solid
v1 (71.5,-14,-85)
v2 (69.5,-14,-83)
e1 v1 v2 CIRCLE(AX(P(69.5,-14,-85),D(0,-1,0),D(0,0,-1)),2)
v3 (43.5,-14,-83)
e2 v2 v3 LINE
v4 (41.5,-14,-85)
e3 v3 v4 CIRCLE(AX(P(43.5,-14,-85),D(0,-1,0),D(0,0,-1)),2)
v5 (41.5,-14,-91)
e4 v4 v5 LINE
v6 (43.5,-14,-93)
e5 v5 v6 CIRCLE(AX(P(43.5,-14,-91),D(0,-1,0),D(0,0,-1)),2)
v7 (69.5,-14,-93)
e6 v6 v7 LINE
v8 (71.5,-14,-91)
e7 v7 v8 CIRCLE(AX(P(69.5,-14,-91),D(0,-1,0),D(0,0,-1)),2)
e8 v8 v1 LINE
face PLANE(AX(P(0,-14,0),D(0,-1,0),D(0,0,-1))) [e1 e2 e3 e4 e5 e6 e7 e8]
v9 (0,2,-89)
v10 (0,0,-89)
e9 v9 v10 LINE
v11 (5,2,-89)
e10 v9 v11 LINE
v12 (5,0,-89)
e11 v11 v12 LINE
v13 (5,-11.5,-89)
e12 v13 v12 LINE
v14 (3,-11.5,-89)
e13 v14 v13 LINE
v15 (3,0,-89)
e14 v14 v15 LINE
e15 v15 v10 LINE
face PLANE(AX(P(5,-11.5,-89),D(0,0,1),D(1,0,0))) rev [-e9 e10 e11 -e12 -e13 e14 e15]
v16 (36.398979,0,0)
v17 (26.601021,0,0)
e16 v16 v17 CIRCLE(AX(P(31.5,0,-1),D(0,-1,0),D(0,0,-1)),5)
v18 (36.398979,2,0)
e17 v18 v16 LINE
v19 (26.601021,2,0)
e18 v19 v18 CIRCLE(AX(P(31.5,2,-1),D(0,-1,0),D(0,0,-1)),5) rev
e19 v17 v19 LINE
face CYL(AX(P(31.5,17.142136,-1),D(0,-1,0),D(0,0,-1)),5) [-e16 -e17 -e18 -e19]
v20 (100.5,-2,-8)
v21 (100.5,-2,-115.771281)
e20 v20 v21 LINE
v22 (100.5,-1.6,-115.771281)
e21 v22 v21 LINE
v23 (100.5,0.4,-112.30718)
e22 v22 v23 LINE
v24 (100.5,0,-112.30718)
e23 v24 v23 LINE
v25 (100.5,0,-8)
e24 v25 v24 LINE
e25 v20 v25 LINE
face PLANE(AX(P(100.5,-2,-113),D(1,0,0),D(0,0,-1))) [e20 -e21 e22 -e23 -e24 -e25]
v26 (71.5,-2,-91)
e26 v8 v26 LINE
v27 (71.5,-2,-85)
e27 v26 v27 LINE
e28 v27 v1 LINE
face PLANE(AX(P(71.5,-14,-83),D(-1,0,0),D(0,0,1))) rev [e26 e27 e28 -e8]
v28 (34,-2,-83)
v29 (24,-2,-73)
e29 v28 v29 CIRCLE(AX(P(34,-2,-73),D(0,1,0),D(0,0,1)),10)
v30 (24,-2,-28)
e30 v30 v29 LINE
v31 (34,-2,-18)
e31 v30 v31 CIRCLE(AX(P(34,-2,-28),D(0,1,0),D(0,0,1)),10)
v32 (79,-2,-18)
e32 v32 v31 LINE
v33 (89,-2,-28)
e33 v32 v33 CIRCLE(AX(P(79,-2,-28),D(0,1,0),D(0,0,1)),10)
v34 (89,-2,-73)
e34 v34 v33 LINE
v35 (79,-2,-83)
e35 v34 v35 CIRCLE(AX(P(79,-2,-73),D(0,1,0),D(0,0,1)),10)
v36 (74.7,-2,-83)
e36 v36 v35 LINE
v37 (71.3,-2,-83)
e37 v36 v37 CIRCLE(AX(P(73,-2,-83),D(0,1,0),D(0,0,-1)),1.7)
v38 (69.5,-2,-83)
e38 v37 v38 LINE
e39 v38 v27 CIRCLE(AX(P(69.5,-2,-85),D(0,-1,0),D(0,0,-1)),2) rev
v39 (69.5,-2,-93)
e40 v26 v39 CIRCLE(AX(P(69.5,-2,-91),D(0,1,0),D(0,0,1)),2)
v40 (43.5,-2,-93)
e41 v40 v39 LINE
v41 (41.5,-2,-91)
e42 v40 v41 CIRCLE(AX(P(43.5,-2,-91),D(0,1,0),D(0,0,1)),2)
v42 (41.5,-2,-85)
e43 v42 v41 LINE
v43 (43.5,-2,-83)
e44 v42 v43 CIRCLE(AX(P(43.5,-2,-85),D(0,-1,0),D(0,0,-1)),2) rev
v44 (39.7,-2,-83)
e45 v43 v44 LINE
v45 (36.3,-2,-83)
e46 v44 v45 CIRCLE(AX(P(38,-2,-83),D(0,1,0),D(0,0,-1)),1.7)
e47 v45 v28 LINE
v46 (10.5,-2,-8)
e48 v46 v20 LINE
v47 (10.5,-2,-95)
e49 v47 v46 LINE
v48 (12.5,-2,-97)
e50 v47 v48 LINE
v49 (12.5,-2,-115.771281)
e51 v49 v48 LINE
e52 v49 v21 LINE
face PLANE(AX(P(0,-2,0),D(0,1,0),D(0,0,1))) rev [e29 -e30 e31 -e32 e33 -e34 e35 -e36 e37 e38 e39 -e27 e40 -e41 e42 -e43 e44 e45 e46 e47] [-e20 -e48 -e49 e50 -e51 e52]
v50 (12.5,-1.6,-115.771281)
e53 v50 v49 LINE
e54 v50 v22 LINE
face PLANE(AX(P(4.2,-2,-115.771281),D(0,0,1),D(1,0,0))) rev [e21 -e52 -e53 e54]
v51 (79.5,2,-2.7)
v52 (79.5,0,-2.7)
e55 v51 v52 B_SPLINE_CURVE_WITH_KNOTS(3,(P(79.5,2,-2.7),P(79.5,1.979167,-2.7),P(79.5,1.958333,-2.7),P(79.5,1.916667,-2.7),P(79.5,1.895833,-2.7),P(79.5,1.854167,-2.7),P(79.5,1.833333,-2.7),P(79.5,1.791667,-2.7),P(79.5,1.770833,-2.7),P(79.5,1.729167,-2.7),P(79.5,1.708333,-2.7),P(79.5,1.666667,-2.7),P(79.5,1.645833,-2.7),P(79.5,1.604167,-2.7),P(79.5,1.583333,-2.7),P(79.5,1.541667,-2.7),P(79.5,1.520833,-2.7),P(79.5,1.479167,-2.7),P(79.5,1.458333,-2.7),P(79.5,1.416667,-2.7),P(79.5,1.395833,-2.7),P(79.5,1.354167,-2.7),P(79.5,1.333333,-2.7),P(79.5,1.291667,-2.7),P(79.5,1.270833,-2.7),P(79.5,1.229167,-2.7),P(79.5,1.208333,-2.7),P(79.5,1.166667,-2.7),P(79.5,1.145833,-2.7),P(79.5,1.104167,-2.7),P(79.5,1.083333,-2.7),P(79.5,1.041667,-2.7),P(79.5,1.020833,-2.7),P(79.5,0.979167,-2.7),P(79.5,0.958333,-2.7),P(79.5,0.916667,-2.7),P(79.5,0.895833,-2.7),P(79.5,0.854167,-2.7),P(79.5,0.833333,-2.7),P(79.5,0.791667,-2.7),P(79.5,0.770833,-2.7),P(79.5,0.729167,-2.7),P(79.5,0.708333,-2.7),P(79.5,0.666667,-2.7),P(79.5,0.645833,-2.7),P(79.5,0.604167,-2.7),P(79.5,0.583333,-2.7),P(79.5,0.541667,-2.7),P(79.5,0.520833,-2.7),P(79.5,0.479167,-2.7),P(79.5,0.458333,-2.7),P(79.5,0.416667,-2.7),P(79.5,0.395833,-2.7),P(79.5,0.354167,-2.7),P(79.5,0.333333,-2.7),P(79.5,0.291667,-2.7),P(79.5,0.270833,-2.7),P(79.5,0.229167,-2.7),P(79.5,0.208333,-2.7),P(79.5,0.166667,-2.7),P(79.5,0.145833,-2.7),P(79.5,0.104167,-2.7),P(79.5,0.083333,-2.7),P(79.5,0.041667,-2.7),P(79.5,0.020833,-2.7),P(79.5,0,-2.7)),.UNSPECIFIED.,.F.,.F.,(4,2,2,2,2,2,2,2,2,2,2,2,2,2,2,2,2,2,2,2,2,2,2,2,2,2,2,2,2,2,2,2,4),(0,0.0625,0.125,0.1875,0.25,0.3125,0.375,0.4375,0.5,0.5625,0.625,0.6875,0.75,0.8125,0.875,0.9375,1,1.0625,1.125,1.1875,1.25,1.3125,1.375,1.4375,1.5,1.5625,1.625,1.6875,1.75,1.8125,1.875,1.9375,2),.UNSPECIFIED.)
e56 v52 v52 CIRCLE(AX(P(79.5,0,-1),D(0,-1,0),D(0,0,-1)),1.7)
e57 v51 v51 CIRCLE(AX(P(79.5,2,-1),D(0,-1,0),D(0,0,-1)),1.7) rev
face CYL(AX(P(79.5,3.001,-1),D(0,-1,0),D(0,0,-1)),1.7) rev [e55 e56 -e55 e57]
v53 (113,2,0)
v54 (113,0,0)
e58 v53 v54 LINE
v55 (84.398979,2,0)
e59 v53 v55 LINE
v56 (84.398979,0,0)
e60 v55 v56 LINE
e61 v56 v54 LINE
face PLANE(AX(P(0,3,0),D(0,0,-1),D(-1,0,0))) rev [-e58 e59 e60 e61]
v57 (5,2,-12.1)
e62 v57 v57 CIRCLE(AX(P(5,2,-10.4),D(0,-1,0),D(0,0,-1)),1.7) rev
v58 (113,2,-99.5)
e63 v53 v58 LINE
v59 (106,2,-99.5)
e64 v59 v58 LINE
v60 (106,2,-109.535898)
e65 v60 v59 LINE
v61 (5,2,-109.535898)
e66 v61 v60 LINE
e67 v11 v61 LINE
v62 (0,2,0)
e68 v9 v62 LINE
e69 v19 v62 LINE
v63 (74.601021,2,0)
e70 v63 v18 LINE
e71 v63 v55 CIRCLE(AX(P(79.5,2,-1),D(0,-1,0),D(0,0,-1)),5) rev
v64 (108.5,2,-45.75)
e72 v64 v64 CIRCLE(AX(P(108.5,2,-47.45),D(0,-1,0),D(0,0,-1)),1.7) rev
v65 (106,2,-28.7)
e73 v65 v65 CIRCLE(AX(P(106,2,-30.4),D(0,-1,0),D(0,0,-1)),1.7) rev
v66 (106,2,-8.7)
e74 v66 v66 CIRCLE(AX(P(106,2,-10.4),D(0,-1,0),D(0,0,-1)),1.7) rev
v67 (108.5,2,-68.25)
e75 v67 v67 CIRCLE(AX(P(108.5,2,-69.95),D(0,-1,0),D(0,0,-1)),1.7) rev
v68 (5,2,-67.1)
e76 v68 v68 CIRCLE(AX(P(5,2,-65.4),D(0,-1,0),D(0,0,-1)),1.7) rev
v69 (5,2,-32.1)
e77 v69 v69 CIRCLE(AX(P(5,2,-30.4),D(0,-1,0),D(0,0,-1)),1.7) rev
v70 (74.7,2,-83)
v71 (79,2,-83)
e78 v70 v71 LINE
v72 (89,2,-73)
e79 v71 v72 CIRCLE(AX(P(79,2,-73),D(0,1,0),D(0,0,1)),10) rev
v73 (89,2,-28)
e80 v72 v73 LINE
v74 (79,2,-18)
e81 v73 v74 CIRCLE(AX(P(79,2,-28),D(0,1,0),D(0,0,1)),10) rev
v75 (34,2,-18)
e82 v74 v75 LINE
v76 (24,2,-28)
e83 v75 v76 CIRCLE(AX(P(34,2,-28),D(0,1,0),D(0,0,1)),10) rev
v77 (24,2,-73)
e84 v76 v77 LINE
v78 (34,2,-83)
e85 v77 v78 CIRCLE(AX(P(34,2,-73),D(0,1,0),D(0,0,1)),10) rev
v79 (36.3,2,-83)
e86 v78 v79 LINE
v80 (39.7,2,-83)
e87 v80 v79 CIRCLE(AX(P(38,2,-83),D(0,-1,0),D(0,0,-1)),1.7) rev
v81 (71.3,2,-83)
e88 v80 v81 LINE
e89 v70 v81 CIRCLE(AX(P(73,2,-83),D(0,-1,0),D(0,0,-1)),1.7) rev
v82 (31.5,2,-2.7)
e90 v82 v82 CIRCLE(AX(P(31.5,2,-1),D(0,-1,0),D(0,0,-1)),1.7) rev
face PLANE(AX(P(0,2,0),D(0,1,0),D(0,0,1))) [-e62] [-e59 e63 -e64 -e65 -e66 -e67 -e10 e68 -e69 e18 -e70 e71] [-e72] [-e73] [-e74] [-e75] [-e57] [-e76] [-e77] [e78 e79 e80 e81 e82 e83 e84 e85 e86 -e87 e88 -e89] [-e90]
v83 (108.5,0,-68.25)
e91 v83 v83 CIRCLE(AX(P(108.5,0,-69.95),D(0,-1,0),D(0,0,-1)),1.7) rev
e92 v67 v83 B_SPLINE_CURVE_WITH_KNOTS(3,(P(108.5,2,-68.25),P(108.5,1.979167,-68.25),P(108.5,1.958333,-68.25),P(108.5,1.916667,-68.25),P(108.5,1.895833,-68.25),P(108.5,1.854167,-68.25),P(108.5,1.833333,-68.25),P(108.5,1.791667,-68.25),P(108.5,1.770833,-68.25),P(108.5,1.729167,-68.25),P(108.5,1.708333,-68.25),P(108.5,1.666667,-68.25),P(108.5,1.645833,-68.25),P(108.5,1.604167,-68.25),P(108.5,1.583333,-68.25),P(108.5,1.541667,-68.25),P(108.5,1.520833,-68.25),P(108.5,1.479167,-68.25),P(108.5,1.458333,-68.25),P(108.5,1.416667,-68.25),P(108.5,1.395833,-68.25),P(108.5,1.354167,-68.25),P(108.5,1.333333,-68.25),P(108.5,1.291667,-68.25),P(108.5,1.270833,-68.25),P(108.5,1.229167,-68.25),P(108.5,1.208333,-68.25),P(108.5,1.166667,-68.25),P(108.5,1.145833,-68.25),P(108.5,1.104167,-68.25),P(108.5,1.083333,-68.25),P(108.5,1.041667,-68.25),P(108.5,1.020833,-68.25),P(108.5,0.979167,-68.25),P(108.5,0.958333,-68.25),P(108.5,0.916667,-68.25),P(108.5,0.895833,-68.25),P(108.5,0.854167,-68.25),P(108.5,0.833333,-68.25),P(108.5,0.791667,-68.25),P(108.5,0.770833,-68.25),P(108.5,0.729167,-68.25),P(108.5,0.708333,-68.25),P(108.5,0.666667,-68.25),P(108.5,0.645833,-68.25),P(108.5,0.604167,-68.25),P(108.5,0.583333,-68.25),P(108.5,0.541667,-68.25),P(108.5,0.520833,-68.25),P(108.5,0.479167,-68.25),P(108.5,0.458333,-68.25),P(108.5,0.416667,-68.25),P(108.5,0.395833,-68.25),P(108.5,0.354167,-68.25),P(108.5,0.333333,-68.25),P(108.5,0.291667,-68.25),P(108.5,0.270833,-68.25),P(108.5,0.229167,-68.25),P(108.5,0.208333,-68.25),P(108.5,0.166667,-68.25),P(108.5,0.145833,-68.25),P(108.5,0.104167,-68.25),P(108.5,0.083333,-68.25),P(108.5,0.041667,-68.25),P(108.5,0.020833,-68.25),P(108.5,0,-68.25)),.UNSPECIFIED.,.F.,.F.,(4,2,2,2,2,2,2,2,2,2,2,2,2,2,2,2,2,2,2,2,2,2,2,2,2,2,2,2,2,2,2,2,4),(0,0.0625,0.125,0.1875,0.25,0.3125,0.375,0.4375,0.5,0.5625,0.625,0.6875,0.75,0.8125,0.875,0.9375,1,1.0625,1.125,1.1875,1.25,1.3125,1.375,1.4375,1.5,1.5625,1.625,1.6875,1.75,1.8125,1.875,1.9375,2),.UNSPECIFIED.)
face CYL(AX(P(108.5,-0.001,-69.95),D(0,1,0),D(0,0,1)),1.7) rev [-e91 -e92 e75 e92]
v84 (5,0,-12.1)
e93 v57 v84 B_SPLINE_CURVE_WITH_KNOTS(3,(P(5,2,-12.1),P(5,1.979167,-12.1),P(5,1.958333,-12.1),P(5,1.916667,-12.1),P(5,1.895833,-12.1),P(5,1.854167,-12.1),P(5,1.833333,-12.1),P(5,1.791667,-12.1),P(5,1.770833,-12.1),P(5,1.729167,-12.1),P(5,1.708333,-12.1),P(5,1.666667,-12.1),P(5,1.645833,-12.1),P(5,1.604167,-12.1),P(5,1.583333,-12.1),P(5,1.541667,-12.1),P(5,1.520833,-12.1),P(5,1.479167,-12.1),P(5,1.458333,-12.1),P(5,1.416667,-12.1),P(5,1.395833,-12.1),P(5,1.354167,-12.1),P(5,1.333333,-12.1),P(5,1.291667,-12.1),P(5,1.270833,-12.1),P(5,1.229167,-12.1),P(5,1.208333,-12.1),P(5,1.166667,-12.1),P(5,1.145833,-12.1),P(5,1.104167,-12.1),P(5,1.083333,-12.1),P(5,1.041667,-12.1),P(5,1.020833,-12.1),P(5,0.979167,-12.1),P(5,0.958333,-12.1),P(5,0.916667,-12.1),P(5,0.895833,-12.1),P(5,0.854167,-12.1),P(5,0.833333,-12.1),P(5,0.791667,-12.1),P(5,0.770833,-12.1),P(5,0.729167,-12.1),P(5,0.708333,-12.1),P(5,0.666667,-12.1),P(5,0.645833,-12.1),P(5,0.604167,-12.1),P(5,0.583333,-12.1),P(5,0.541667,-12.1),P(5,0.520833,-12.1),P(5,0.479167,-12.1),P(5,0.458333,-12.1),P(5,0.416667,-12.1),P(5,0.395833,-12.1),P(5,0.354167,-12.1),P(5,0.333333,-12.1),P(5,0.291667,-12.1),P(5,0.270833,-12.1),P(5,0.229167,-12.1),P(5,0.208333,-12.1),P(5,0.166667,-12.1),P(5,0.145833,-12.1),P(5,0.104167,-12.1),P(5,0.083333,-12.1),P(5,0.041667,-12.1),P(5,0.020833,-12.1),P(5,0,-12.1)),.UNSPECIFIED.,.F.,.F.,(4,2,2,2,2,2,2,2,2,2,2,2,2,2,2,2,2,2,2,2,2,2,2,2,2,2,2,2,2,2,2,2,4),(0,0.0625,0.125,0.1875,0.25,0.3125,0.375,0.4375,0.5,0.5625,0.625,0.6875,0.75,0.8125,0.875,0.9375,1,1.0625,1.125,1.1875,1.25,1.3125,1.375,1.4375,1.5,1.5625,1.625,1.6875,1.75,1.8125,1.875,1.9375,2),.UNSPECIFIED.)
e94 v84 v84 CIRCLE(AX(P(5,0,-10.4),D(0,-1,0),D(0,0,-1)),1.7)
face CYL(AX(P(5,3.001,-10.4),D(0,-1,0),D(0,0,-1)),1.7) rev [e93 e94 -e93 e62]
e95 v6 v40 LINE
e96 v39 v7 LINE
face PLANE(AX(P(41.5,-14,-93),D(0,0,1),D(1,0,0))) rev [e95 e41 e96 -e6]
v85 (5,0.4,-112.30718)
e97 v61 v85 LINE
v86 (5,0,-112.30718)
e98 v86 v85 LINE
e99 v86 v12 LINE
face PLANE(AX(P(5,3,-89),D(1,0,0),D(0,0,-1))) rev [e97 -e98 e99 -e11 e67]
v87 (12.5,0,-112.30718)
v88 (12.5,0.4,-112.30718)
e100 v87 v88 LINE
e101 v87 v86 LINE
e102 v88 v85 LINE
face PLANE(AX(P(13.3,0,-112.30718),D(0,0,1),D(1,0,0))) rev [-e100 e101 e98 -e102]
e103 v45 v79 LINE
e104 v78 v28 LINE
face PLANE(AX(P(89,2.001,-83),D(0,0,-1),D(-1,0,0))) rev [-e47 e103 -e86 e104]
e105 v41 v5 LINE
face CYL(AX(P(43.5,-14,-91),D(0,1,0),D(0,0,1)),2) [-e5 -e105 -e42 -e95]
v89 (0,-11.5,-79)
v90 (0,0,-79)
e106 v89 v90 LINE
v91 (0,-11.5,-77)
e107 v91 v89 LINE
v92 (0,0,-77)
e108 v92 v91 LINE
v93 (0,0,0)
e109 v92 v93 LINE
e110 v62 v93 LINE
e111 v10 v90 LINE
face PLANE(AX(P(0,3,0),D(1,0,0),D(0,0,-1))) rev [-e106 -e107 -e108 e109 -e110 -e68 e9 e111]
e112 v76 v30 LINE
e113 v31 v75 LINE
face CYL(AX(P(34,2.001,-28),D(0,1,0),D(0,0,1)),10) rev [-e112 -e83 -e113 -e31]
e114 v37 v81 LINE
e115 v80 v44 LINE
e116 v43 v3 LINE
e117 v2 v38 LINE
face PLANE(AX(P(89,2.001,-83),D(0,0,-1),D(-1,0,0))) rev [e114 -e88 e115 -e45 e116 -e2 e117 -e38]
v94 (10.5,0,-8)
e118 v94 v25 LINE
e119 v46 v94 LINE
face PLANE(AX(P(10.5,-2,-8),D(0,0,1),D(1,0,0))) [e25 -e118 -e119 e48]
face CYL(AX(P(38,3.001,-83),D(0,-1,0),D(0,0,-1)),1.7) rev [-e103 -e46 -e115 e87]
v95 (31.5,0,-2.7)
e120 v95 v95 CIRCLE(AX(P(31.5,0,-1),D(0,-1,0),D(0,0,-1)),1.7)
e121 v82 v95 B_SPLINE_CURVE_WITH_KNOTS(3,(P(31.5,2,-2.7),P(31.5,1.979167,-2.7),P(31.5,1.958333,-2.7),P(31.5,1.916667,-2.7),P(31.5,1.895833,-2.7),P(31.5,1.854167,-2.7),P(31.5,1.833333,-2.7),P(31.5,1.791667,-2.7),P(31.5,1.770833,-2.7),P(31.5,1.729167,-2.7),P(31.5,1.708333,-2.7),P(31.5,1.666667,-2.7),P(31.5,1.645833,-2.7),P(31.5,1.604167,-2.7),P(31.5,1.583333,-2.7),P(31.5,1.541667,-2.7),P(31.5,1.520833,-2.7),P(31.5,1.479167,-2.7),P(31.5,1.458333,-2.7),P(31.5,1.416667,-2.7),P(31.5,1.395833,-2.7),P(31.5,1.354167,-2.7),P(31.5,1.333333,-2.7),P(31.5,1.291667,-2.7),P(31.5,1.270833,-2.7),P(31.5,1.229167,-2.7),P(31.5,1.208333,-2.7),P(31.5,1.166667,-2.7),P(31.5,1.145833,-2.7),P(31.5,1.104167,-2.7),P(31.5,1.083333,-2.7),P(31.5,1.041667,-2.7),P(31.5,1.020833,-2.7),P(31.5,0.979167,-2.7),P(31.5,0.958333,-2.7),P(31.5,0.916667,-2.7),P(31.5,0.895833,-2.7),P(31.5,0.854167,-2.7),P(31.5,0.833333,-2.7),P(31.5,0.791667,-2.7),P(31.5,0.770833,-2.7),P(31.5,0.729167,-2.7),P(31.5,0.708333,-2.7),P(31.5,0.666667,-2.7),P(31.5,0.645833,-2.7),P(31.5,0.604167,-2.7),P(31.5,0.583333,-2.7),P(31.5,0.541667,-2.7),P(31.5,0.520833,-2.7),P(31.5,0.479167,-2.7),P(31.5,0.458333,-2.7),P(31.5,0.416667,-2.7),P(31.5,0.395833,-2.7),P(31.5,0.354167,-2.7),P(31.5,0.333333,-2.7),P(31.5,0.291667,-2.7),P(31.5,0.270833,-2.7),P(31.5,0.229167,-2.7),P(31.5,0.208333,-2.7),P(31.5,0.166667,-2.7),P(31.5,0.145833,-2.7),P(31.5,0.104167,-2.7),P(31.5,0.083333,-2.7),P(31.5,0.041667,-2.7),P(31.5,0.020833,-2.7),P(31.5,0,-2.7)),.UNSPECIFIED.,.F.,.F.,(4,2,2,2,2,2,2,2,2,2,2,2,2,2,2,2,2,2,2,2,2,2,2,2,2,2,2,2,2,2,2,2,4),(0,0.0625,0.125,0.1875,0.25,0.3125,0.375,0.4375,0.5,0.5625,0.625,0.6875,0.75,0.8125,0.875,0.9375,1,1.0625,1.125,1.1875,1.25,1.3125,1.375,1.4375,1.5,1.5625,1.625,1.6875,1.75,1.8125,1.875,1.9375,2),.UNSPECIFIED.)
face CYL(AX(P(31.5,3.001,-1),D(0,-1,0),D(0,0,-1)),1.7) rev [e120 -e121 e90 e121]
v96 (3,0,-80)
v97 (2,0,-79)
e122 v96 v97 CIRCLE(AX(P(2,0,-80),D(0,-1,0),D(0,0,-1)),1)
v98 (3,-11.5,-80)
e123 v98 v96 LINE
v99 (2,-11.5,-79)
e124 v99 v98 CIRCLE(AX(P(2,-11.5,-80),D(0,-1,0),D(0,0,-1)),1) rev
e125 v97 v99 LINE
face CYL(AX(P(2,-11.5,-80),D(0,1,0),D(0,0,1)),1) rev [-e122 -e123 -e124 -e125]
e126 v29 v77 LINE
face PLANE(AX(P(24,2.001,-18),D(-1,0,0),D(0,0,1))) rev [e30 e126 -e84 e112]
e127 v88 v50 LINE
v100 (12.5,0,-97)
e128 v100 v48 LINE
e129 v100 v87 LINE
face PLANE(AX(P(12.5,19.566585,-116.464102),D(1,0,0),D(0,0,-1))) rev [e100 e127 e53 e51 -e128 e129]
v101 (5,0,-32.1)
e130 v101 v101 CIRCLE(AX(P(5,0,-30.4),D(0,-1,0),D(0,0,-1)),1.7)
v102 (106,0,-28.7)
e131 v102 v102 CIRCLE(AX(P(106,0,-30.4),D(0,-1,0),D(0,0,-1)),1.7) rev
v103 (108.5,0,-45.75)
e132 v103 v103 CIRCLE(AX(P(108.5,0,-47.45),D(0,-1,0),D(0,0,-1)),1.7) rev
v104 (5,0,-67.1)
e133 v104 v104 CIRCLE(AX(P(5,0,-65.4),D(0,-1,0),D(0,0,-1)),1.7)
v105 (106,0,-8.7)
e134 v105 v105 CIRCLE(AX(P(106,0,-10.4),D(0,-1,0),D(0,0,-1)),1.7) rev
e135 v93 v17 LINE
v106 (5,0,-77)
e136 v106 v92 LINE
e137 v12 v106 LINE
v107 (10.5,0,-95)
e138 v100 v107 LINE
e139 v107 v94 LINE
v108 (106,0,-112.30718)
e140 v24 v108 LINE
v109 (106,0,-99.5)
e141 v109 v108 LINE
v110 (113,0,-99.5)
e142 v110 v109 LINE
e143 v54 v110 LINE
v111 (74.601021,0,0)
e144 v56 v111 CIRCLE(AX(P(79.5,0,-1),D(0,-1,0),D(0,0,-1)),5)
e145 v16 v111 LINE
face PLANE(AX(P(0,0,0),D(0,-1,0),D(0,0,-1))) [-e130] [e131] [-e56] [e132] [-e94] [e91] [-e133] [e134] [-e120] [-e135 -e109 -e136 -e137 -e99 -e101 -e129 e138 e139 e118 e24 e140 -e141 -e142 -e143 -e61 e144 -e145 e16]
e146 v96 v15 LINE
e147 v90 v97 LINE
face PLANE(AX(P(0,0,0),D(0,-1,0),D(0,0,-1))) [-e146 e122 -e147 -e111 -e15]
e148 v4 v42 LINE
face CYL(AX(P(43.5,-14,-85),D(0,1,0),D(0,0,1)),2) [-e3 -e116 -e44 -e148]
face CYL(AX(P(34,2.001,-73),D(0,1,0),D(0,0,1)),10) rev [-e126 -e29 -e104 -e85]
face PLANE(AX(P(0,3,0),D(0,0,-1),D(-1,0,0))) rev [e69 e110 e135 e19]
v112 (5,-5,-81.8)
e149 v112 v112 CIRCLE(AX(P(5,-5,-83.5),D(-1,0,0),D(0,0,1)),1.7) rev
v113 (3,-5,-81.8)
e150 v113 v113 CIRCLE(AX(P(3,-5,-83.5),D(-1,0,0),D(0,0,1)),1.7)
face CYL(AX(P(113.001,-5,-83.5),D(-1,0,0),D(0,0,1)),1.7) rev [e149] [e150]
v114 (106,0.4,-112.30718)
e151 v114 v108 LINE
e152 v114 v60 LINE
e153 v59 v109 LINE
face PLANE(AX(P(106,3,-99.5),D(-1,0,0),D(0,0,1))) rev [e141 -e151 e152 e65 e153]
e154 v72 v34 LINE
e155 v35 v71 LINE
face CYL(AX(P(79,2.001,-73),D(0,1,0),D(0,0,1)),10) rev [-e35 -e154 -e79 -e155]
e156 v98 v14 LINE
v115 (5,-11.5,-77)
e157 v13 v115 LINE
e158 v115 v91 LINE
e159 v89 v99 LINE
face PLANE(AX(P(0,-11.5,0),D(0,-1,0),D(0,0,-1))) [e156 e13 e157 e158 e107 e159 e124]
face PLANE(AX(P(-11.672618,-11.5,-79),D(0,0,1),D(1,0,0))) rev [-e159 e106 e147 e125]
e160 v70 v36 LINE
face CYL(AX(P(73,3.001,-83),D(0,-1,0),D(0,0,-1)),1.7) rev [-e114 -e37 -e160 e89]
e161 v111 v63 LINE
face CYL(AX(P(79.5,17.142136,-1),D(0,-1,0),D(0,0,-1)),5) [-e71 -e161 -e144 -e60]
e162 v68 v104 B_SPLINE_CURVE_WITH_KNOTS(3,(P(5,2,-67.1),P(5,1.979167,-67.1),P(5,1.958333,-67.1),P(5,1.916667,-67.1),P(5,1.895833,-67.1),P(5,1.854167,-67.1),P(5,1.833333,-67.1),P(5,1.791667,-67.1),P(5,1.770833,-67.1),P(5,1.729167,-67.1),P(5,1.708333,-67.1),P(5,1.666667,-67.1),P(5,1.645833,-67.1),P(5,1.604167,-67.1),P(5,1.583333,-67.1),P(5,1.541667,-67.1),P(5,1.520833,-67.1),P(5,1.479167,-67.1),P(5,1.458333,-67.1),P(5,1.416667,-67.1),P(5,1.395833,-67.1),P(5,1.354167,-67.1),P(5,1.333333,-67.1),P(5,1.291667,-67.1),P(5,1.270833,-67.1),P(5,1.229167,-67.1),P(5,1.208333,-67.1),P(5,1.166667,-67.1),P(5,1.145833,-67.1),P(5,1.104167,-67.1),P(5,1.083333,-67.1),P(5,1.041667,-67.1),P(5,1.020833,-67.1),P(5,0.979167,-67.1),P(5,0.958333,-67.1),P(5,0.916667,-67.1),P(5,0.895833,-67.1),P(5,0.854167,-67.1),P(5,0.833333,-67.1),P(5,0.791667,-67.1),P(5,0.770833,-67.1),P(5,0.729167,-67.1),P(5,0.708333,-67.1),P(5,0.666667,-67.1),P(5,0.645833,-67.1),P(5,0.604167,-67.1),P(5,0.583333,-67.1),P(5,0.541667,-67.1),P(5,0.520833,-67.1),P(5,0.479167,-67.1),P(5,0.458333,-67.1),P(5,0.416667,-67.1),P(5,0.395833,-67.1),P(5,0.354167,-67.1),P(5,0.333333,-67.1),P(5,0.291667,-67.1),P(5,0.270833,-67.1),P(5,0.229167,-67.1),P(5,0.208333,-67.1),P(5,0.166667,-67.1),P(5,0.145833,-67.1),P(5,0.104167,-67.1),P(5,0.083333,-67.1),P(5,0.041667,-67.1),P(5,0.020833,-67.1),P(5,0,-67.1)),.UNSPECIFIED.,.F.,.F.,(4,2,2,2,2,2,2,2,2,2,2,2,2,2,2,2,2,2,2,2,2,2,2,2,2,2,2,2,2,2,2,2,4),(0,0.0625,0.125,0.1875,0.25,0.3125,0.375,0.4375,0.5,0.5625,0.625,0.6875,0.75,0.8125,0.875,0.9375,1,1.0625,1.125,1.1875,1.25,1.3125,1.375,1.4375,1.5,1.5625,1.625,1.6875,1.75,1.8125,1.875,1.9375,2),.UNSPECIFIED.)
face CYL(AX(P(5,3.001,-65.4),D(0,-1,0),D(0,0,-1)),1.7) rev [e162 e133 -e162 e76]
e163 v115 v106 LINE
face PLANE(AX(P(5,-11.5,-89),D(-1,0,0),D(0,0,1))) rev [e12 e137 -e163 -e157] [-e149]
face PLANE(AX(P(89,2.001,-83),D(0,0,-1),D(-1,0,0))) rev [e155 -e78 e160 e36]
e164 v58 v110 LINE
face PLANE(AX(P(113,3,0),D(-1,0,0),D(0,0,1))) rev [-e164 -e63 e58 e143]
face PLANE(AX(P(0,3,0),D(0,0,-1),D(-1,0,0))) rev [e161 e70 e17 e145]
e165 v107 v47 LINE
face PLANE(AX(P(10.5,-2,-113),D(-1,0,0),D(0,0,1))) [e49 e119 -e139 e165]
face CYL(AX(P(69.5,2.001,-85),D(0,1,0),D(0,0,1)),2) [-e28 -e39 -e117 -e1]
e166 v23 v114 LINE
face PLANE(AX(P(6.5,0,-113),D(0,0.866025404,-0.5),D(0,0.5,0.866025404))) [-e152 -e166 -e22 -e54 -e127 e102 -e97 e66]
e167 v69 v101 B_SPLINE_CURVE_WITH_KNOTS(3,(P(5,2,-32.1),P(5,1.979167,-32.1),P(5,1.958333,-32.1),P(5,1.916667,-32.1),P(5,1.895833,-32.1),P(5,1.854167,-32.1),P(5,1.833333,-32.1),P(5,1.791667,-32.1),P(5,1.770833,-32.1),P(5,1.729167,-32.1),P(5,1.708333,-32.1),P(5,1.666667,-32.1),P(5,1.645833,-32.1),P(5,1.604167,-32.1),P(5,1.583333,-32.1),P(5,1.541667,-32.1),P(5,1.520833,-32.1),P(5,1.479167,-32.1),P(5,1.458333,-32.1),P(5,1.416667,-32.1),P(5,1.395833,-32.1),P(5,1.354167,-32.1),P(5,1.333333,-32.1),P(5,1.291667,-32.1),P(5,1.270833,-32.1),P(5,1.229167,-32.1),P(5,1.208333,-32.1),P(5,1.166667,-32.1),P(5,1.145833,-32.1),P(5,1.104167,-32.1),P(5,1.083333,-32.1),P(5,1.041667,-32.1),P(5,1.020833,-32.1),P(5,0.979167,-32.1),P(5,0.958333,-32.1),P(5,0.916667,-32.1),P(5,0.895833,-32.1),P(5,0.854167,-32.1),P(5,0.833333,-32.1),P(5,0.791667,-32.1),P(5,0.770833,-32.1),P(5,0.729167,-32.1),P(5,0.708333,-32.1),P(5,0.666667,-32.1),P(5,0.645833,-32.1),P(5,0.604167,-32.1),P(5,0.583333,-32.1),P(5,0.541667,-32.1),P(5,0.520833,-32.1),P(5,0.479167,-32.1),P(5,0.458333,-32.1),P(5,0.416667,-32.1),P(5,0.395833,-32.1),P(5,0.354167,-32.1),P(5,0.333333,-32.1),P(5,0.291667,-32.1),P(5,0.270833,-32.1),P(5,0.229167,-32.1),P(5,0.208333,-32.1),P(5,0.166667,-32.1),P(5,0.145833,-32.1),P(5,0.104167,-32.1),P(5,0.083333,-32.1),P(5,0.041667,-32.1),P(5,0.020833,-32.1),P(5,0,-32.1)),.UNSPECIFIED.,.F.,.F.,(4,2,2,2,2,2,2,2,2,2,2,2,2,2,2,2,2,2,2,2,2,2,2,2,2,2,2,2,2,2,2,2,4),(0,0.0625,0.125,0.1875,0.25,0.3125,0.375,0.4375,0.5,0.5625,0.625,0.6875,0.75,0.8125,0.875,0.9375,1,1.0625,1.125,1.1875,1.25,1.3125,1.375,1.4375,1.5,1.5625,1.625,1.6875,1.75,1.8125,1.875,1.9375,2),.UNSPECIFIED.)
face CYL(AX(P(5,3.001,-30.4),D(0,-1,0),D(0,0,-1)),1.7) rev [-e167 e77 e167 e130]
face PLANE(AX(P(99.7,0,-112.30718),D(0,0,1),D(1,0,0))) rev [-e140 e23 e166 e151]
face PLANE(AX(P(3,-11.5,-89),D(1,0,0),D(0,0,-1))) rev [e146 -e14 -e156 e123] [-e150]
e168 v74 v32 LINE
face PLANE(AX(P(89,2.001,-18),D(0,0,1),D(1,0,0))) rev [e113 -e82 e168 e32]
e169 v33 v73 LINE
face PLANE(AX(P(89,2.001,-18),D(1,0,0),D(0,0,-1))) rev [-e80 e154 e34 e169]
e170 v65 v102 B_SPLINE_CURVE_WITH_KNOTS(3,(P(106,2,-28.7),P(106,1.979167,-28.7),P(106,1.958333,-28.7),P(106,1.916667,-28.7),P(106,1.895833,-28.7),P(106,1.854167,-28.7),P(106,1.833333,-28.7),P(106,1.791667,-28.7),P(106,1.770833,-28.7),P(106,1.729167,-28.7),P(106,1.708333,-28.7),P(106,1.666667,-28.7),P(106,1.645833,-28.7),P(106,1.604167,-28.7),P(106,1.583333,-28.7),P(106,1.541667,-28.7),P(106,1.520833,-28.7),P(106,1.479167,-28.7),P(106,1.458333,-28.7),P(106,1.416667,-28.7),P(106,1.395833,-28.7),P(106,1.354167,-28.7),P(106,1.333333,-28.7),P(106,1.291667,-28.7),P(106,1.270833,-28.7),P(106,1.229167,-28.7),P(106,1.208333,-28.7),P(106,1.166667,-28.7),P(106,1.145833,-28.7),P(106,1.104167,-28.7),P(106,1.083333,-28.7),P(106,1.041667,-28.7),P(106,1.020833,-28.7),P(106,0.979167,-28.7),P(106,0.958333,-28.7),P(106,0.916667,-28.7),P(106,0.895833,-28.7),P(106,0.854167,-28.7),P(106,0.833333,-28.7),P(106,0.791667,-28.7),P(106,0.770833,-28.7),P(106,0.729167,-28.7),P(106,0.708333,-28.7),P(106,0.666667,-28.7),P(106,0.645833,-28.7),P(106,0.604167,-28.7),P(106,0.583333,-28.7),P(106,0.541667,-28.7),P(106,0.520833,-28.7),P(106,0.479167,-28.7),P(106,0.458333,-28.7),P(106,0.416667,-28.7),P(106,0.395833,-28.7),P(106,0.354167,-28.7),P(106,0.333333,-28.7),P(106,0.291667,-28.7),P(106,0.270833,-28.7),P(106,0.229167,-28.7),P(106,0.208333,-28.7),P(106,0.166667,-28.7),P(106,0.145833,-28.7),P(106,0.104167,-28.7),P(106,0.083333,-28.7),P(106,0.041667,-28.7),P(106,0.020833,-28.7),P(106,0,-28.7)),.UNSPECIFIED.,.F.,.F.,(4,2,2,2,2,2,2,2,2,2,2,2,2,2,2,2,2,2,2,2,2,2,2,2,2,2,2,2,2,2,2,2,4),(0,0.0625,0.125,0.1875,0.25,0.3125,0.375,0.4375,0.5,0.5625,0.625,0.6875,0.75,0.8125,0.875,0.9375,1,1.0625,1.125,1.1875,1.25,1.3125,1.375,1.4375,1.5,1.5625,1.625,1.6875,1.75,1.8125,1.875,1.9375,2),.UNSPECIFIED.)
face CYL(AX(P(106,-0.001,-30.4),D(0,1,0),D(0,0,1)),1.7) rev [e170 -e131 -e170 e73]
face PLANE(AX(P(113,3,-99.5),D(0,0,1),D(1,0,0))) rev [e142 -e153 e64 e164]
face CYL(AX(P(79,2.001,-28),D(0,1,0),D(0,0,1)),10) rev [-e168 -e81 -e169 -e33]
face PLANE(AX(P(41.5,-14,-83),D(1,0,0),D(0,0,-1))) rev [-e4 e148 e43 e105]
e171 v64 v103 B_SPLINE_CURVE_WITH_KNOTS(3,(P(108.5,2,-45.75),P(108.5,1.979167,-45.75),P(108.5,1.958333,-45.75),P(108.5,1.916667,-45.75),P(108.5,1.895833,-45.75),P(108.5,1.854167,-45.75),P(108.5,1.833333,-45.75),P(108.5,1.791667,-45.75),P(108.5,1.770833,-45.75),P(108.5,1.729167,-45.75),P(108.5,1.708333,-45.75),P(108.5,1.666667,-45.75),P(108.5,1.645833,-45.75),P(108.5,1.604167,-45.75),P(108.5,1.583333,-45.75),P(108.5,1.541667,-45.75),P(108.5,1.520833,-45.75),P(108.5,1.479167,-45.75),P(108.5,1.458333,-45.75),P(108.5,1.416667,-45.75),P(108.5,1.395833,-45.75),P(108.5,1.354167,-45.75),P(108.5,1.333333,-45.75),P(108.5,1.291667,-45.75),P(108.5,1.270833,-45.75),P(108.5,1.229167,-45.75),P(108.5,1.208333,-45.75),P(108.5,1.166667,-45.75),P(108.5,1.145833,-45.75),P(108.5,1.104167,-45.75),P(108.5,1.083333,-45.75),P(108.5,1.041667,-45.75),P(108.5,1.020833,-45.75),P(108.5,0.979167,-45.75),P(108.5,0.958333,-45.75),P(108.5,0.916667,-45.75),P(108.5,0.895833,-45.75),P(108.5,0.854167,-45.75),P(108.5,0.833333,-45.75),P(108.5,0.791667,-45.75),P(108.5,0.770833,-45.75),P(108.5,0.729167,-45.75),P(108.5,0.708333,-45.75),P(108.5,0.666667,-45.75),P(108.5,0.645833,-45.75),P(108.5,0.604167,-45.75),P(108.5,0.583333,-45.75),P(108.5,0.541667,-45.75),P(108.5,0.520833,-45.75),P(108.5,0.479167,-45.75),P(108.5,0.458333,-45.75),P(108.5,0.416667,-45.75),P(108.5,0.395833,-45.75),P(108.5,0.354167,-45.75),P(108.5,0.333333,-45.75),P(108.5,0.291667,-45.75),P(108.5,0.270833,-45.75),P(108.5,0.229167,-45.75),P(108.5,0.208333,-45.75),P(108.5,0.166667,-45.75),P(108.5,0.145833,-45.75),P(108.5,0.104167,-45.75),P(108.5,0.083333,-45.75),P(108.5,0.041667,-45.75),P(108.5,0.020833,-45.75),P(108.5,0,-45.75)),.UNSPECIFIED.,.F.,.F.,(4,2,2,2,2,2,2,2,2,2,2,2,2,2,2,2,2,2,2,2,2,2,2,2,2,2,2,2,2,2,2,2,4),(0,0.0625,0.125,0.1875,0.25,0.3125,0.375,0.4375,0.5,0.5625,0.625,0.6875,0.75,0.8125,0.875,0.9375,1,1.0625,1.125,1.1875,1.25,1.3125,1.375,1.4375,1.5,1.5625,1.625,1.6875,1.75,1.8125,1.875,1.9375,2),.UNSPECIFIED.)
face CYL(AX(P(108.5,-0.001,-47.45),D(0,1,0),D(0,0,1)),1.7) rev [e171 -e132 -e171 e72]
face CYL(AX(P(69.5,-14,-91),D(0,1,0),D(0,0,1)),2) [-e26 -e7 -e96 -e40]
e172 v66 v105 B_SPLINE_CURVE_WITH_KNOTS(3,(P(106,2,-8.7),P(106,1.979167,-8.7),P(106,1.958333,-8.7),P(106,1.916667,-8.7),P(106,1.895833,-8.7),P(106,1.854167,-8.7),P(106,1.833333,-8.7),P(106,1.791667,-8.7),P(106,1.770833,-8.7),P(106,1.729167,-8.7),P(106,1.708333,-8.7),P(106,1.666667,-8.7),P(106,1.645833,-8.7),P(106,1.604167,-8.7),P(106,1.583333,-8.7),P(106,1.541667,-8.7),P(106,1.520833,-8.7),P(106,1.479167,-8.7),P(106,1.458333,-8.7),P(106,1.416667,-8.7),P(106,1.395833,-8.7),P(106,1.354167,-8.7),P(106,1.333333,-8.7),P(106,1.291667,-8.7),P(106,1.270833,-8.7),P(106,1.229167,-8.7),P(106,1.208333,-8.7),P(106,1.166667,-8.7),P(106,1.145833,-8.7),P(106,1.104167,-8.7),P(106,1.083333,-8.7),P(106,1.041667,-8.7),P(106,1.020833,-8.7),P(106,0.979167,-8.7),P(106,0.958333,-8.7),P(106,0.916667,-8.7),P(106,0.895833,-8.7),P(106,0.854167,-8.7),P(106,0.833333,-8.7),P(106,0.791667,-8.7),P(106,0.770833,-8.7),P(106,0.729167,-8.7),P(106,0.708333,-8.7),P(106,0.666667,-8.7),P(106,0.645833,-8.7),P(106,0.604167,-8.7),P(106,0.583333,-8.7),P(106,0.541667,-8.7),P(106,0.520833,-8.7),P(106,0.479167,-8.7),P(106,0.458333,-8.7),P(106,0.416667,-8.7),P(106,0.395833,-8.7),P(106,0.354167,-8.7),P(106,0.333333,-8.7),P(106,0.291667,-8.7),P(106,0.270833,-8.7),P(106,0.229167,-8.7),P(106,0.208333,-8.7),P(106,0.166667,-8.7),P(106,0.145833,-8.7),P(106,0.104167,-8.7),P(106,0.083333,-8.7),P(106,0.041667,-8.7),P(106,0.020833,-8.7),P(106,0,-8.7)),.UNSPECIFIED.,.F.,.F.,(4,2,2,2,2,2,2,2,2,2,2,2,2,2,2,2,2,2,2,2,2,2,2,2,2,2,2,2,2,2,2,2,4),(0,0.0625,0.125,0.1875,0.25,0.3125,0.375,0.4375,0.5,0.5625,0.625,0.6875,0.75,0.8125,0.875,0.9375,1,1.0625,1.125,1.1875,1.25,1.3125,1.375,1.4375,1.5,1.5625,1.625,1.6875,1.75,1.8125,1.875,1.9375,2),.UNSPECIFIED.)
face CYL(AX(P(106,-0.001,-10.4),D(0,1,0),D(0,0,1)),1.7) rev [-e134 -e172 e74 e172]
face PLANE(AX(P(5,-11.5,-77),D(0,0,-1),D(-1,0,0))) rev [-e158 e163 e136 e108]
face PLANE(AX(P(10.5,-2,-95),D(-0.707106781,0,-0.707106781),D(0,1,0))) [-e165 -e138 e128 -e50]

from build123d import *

# Parameters (mm, degrees)
SKETCH_1_W               = 113
SKETCH_1_H               = 113
EXTRUDE_1_DEPTH          = 3
CUT_EXTRUDE_1_REACH      = 161.834
SKETCH_2_R               = 1.7
SKETCH_3_W               = 90
SKETCH_3_H               = 105
EXTRUDE_2_DEPTH          = 2
SKETCH_5_R               = 5
EXTRUDE_3_DEPTH          = 3
CUT_EXTRUDE_2_REACH      = 161.834
SKETCH_6_R               = 1.7
CUT_EXTRUDE_3_REACH      = 161.834
SKETCH_7_R               = 1.7
CUT_EXTRUDE_4_REACH      = 161.884
SKETCH_8_R               = 1.7
EXTRUDE_5_DEPTH          = 90
CUT_EXTRUDE_5_DEPTH      = 2
SKETCH_13_W              = 2
SKETCH_13_H              = 12
EXTRUDE_6_DEPTH          = 11.5
CUT_EXTRUDE_6_REACH      = 162.612
SKETCH_14_R              = 1.7
CUT_EXTRUDE_7_REACH      = 164.681
EXTRUDE_7_DEPTH          = 8.5
SKETCH_17_W              = 2
SKETCH_17_H              = 11.5
EXTRUDE_8_DEPTH          = 3
FILLET_1_R               = 1
CUT_EXTRUDE_8_DEPTH      = 163.681089759
SKETCH_20_W              = 113
SKETCH_20_H              = 12.124355653
CUT_EXTRUDE_9_DEPTH      = 1
CHAMFER_1_SIZE           = 1
SKETCH_21_W              = 7
SKETCH_21_H              = 13.5
CUT_EXTRUDE_10_DEPTH     = 163.681089759
SKETCH_22_W              = 5
SKETCH_22_H              = 24
CUT_EXTRUDE_11_DEPTH     = 163.681089759
SKETCH_23_W              = 2
SKETCH_23_H              = 19.464101615
CUT_EXTRUDE_12_DEPTH     = 2
CUT_EXTRUDE_START        = -2
CUT_EXTRUDE_13_OUTLINE_W = 93
CUT_EXTRUDE_13_OUTLINE_H = 1.228718708
CUT_EXTRUDE_13_DEPTH     = 2
SKETCH_25_W              = 0.692820323
SKETCH_25_H              = 0.4
CUT_EXTRUDE_14_DEPTH     = 5.5
SKETCH_26_W              = 0.692820323
SKETCH_26_H              = 0.4
CUT_EXTRUDE_15_DEPTH     = 7.5
SKETCH_27_W              = 113
SKETCH_27_H              = 105.875644347
CUT_EXTRUDE_16_DEPTH     = 163.339889035
SKETCH_29_W              = 10
SKETCH_29_H              = 5
CUT_EXTRUDE_17_DEPTH     = 163.185818036
SKETCH_30_W              = 10
SKETCH_30_H              = 2
CUT_EXTRUDE_18_DEPTH     = 37
SKETCH_31_W              = 10
SKETCH_31_H              = 27
EXTRUDE_9_DEPTH          = 1
CUT_EXTRUDE_19_REACH     = 164.056
SKETCH_32_W              = 65
SKETCH_32_H              = 65
SKETCH_33_W              = 30
SKETCH_33_H              = 10
EXTRUDE_10_DEPTH         = 12
EXTRUDE_11_DEPTH         = 12
EXTRUDE_START            = -4
EXTRUDE_11_2_OUTLINE_W   = 10
EXTRUDE_11_2_OUTLINE_H   = 7
EXTRUDE_11_2_DEPTH       = 4


# Read off the part's stored shape, not the designer's step: 切除-拉伸13, 凸台-拉伸11
with BuildPart() as part:
    # 草图1 → 凸台-拉伸1 (new body)
    with BuildSketch(Plane(origin=(0, 0, 0), x_dir=(1, 0, 0), z_dir=(0, 1, 0))):
        with Locations((56.5, 56.5)):
            Rectangle(SKETCH_1_W, SKETCH_1_H)
    extrude(amount=EXTRUDE_1_DEPTH)

    # 草图2 → 切除-拉伸1 (cut, up to next)
    with BuildSketch(Plane(origin=(0, 3, 0), x_dir=(1, 0, 0), z_dir=(0, 1, 0)), mode=Mode.PRIVATE) as cut_extrude_1_sk1:
        with Locations(Location((108.5, 69.95, 0), (0, 0, 270))):
            Circle(SKETCH_2_R)
    cut_extrude_1_tool1 = extrude(cut_extrude_1_sk1.sketch, amount=-CUT_EXTRUDE_1_REACH, mode=Mode.PRIVATE) & part.part
    # 草图2 → 切除-拉伸1 (cut, up to next)
    with BuildSketch(Plane(origin=(0, 3, 0), x_dir=(1, 0, 0), z_dir=(0, 1, 0)), mode=Mode.PRIVATE) as cut_extrude_1_sk2:
        with Locations(Location((108.5, 47.45, 0), (0, 0, 270))):
            Circle(SKETCH_2_R)
    cut_extrude_1_tool2 = extrude(cut_extrude_1_sk2.sketch, amount=-CUT_EXTRUDE_1_REACH, mode=Mode.PRIVATE) & part.part
    # 草图2 → 切除-拉伸1 (cut, up to next)
    with BuildSketch(Plane(origin=(0, 3, 0), x_dir=(1, 0, 0), z_dir=(0, 1, 0)), mode=Mode.PRIVATE) as cut_extrude_1_sk3:
        with Locations(Location((106, 30.4, 0), (0, 0, 270))):
            Circle(SKETCH_2_R)
    cut_extrude_1_tool3 = extrude(cut_extrude_1_sk3.sketch, amount=-CUT_EXTRUDE_1_REACH, mode=Mode.PRIVATE) & part.part
    # 草图2 → 切除-拉伸1 (cut, up to next)
    with BuildSketch(Plane(origin=(0, 3, 0), x_dir=(1, 0, 0), z_dir=(0, 1, 0)), mode=Mode.PRIVATE) as cut_extrude_1_sk4:
        with Locations(Location((106, 10.4, 0), (0, 0, 270))):
            Circle(SKETCH_2_R)
    cut_extrude_1_tool4 = extrude(cut_extrude_1_sk4.sketch, amount=-CUT_EXTRUDE_1_REACH, mode=Mode.PRIVATE) & part.part
    add(cut_extrude_1_tool1.solids().sort_by_distance((108.5, 3, -69.95))[0], mode=Mode.SUBTRACT)
    add(cut_extrude_1_tool2.solids().sort_by_distance((108.5, 3, -47.45))[0], mode=Mode.SUBTRACT)
    add(cut_extrude_1_tool3.solids().sort_by_distance((106, 3, -30.4))[0], mode=Mode.SUBTRACT)
    add(cut_extrude_1_tool4.solids().sort_by_distance((106, 3, -10.4))[0], mode=Mode.SUBTRACT)

    # 草图3 → 凸台-拉伸2 (add)
    with BuildSketch(Plane(origin=(0, 0, 0), x_dir=(1, 0, 0), z_dir=(0, 1, 0))):
        with Locations((55.5, 60.5)):
            Rectangle(SKETCH_3_W, SKETCH_3_H)
    extrude(amount=-EXTRUDE_2_DEPTH)

    # 草图5 → 凸台-拉伸3 (add)
    with BuildSketch(Plane.XZ):
        with Locations((79.5, -1)):
            Circle(SKETCH_5_R)
        with Locations((31.5, -1)):
            Circle(SKETCH_5_R)
    extrude(amount=-EXTRUDE_3_DEPTH)

    # 草图6 → 切除-拉伸2 (cut, up to next)
    with BuildSketch(Plane.XZ, mode=Mode.PRIVATE) as cut_extrude_2_sk1:
        with Locations(Location((31.5, -1, 0), (0, 0, 270))):
            Circle(SKETCH_6_R)
    cut_extrude_2_tool1 = extrude(cut_extrude_2_sk1.sketch, amount=-CUT_EXTRUDE_2_REACH, mode=Mode.PRIVATE) & part.part
    # 草图6 → 切除-拉伸2 (cut, up to next)
    with BuildSketch(Plane.XZ, mode=Mode.PRIVATE) as cut_extrude_2_sk2:
        with Locations(Location((79.5, -1, 0), (0, 0, 270))):
            Circle(SKETCH_6_R)
    cut_extrude_2_tool2 = extrude(cut_extrude_2_sk2.sketch, amount=-CUT_EXTRUDE_2_REACH, mode=Mode.PRIVATE) & part.part
    add(cut_extrude_2_tool1.solids().sort_by_distance((31.5, 0, -1))[0], mode=Mode.SUBTRACT)
    add(cut_extrude_2_tool2.solids().sort_by_distance((79.5, 0, -1))[0], mode=Mode.SUBTRACT)

    # 草图7 → 切除-拉伸3 (cut, up to next)
    with BuildSketch(Plane.XZ, mode=Mode.PRIVATE) as cut_extrude_3_sk1:
        with Locations(Location((5, -10.4, 0), (0, 0, 270))):
            Circle(SKETCH_7_R)
    cut_extrude_3_tool1 = extrude(cut_extrude_3_sk1.sketch, amount=-CUT_EXTRUDE_3_REACH, mode=Mode.PRIVATE) & part.part
    # 草图7 → 切除-拉伸3 (cut, up to next)
    with BuildSketch(Plane.XZ, mode=Mode.PRIVATE) as cut_extrude_3_sk2:
        with Locations(Location((5, -30.4, 0), (0, 0, 270))):
            Circle(SKETCH_7_R)
    cut_extrude_3_tool2 = extrude(cut_extrude_3_sk2.sketch, amount=-CUT_EXTRUDE_3_REACH, mode=Mode.PRIVATE) & part.part
    # 草图7 → 切除-拉伸3 (cut, up to next)
    with BuildSketch(Plane.XZ, mode=Mode.PRIVATE) as cut_extrude_3_sk3:
        with Locations(Location((5, -65.4, 0), (0, 0, 270))):
            Circle(SKETCH_7_R)
    cut_extrude_3_tool3 = extrude(cut_extrude_3_sk3.sketch, amount=-CUT_EXTRUDE_3_REACH, mode=Mode.PRIVATE) & part.part
    add(cut_extrude_3_tool1.solids().sort_by_distance((5, 0, -10.4))[0], mode=Mode.SUBTRACT)
    add(cut_extrude_3_tool2.solids().sort_by_distance((5, 0, -30.4))[0], mode=Mode.SUBTRACT)
    add(cut_extrude_3_tool3.solids().sort_by_distance((5, 0, -65.4))[0], mode=Mode.SUBTRACT)

    # 草图8 → 切除-拉伸4 (cut, up to next)
    with BuildSketch(Plane.XZ.offset(2), mode=Mode.PRIVATE) as cut_extrude_4_sk1:
        with Locations(Location((38, -83, 0), (0, 0, 270))):
            Circle(SKETCH_8_R)
    cut_extrude_4_tool1 = extrude(cut_extrude_4_sk1.sketch, amount=-CUT_EXTRUDE_4_REACH, mode=Mode.PRIVATE) & part.part
    # 草图8 → 切除-拉伸4 (cut, up to next)
    with BuildSketch(Plane.XZ.offset(2), mode=Mode.PRIVATE) as cut_extrude_4_sk2:
        with Locations(Location((73, -83, 0), (0, 0, 270))):
            Circle(SKETCH_8_R)
    cut_extrude_4_tool2 = extrude(cut_extrude_4_sk2.sketch, amount=-CUT_EXTRUDE_4_REACH, mode=Mode.PRIVATE) & part.part
    add(cut_extrude_4_tool1.solids().sort_by_distance((38, -2, -83))[0], mode=Mode.SUBTRACT)
    add(cut_extrude_4_tool2.solids().sort_by_distance((73, -2, -83))[0], mode=Mode.SUBTRACT)

    # 草图10 → 凸台-拉伸5 (add)
    with BuildSketch(Plane(origin=(100.5, 0, 0), x_dir=(0, 0, -1), z_dir=(1, 0, 0))):
        Polygon((113, 0), (116.464101615, -2), (113, -2), align=None)
    extrude(amount=-EXTRUDE_5_DEPTH)

    # 草图11 → 切除-拉伸5 (cut)
    with BuildSketch(Plane(origin=(0, -2, 0), x_dir=(1, 0, 0), z_dir=(0, 1, 0))):
        with BuildLine():
            Line((33, 83), (33, 53))
            ThreePointArc((33, 53), (38, 48), (43, 53))
            Line((43, 53), (43, 83))
            ThreePointArc((43, 83), (38, 88), (33, 83))
        make_face()
        with BuildLine():
            Line((68, 83), (68, 53))
            ThreePointArc((68, 53), (73, 48), (78, 53))
            Line((78, 53), (78, 83))
            ThreePointArc((78, 83), (73, 88), (68, 83))
        make_face()
    extrude(amount=CUT_EXTRUDE_5_DEPTH, mode=Mode.SUBTRACT)

    # 草图13 → 凸台-拉伸6 (add)
    with BuildSketch(Plane.XZ):
        with Locations((4, -83)):
            Rectangle(SKETCH_13_W, SKETCH_13_H)
    extrude(amount=EXTRUDE_6_DEPTH)

    # 草图14 → 切除-拉伸6 (cut, up to next)
    with BuildSketch(Plane.ZY.offset(-3), mode=Mode.PRIVATE) as cut_extrude_6_sk1:
        with Locations((-83.5, -5)):
            Circle(SKETCH_14_R)
    cut_extrude_6_tool1 = extrude(cut_extrude_6_sk1.sketch, amount=-CUT_EXTRUDE_6_REACH, mode=Mode.PRIVATE) & part.part
    add(cut_extrude_6_tool1.solids().sort_by_distance((3, -5, -83.5))[0], mode=Mode.SUBTRACT)

    # 草图15 → 切除-拉伸7 (cut, up to next)
    with BuildSketch(Plane.XZ, mode=Mode.PRIVATE) as cut_extrude_7_sk1:
        Polygon((113, -100.875644347), (106, -113), (113, -113), align=None)
    cut_extrude_7_tool1 = extrude(cut_extrude_7_sk1.sketch, amount=-CUT_EXTRUDE_7_REACH, mode=Mode.PRIVATE) & part.part
    add(cut_extrude_7_tool1.solids().sort_by_distance((110.666667, 0, -108.958548))[0], mode=Mode.SUBTRACT)

    # 草图16 → 凸台-拉伸7 (add)
    with BuildSketch(Plane.XZ):
        Polygon((113, -99.5), (107.5, -99.5), (107.5, -110.401923789), (113, -100.875644347), align=None)
    extrude(amount=EXTRUDE_7_DEPTH)

    # 草图17 → 凸台-拉伸8 (add)
    with BuildSketch(Plane.ZY.offset(-3)):
        with Locations((-78, -5.75)):
            Rectangle(SKETCH_17_W, SKETCH_17_H)
    extrude(amount=EXTRUDE_8_DEPTH)

    # 圆角1
    fillet_1_edges = [part.edges().sort_by_distance(p)[0] for p in [
        (3, -5.75, -79),
    ]]
    fillet(fillet_1_edges, radius=FILLET_1_R)

    # 草图19 → 切除-拉伸8 (cut, through all)
    with BuildSketch(Plane.ZY):
        Polygon((-113, 0), (-107.803847577, 3), (-113, 3), align=None)
    extrude(amount=-CUT_EXTRUDE_8_DEPTH, mode=Mode.SUBTRACT)

    # 草图20 → 切除-拉伸9 (cut)
    with BuildSketch(Plane(origin=(0, 3, 0), x_dir=(1, 0, 0), z_dir=(0, 1, 0))):
        with Locations((56.5, 106.937822173)):
            Rectangle(SKETCH_20_W, SKETCH_20_H)
    extrude(amount=-CUT_EXTRUDE_9_DEPTH, mode=Mode.SUBTRACT)

    # 倒角1
    chamfer_1_edges = [part.edges().sort_by_distance(p)[0] for p in [
        (56.5, 2, -100.875644347),
    ]]
    chamfer(chamfer_1_edges, length=CHAMFER_1_SIZE - 0.0001)  # a hair under: the kernel refuses the full size

    # 草图21 → 切除-拉伸10 (cut, through all)
    with BuildSketch(Plane.XZ.offset(8.5)):
        with Locations((109.5, -106.25)):
            Rectangle(SKETCH_21_W, SKETCH_21_H)
    extrude(amount=-CUT_EXTRUDE_10_DEPTH, mode=Mode.SUBTRACT)

    # 草图22 → 切除-拉伸11 (cut, through all)
    with BuildSketch(Plane.XZ):
        with Locations((2.5, -101)):
            Rectangle(SKETCH_22_W, SKETCH_22_H)
    extrude(amount=-CUT_EXTRUDE_11_DEPTH, mode=Mode.SUBTRACT)

    # 草图23 → 切除-拉伸12 (cut)
    with BuildSketch(Plane.XZ.offset(2)):
        with Locations((11.5, -106.732050808)):
            Rectangle(SKETCH_23_W, SKETCH_23_H)
    extrude(amount=-CUT_EXTRUDE_12_DEPTH, mode=Mode.SUBTRACT)

    # 切除-拉伸13 outline → 切除-拉伸13 (cut)
    with BuildSketch(Plane(origin=(0, 0, 0), x_dir=(1, 0, 0), z_dir=(0, 1, 0)).offset(CUT_EXTRUDE_START)):
        Polygon((9.5, 94), (12.5, 97), (9, 97), (9, 94), align=None)
        with Locations((55.5, 116.385640646)):
            Rectangle(CUT_EXTRUDE_13_OUTLINE_W, CUT_EXTRUDE_13_OUTLINE_H)
    extrude(amount=CUT_EXTRUDE_13_DEPTH, mode=Mode.SUBTRACT)

    # 草图25 → 切除-拉伸14 (cut)
    with BuildSketch(Plane(origin=(106, 0, 0), x_dir=(0, 0, -1), z_dir=(1, 0, 0))):
        with Locations((112.653589839, 0.2)):
            Rectangle(SKETCH_25_W, SKETCH_25_H)
    extrude(amount=-CUT_EXTRUDE_14_DEPTH, mode=Mode.SUBTRACT)

    # 草图26 → 切除-拉伸15 (cut)
    with BuildSketch(Plane.ZY.offset(-5)):
        with Locations((-112.653589839, 0.2)):
            Rectangle(SKETCH_26_W, SKETCH_26_H)
    extrude(amount=-CUT_EXTRUDE_15_DEPTH, mode=Mode.SUBTRACT)

    # 草图27 → 切除-拉伸16 (cut, through all)
    with BuildSketch(Plane(origin=(0, 2, 0), x_dir=(1, 0, 0), z_dir=(0, 1, 0))):
        with Locations((56.5, 48.937822174)):
            Rectangle(SKETCH_27_W, SKETCH_27_H)
    extrude(amount=CUT_EXTRUDE_16_DEPTH, mode=Mode.SUBTRACT)

    # 草图29 → 切除-拉伸17 (cut, through all)
    with BuildSketch(Plane.XZ):
        with Locations((38, -50.5)):
            Rectangle(SKETCH_29_W, SKETCH_29_H)
        with Locations((73, -50.5)):
            Rectangle(SKETCH_29_W, SKETCH_29_H)
    extrude(amount=CUT_EXTRUDE_17_DEPTH, mode=Mode.SUBTRACT)

    # 草图30 → 切除-拉伸18 (cut)
    with BuildSketch(Plane(origin=(0, 0, -48), x_dir=(-1, 0, 0), z_dir=(0, 0, -1))):
        with Locations((-38, -1)):
            Rectangle(SKETCH_30_W, SKETCH_30_H)
        with Locations((-73, -1)):
            Rectangle(SKETCH_30_W, SKETCH_30_H)
    extrude(amount=-CUT_EXTRUDE_18_DEPTH, mode=Mode.SUBTRACT)

    # 草图31 → 凸台-拉伸9 (add)
    with BuildSketch(Plane.XZ):
        with Locations((38, -24.5)):
            Rectangle(SKETCH_31_W, SKETCH_31_H)
        with Locations((73, -24.5)):
            Rectangle(SKETCH_31_W, SKETCH_31_H)
    extrude(amount=EXTRUDE_9_DEPTH)

    # 草图32 → 切除-拉伸19 (cut, up to next)
    with BuildSketch(Plane.XZ.offset(2), mode=Mode.PRIVATE) as cut_extrude_19_sk1:
        with Locations((56.5, -50.5)):
            Rectangle(SKETCH_32_W, SKETCH_32_H)
    cut_extrude_19_tool1 = extrude(cut_extrude_19_sk1.sketch, amount=-CUT_EXTRUDE_19_REACH, mode=Mode.PRIVATE) & part.part
    add(cut_extrude_19_tool1.solids().sort_by_distance((56.5, -2, -50.5))[0], mode=Mode.SUBTRACT)

    # 草图33 → 凸台-拉伸10 (add)
    with BuildSketch(Plane.XZ.offset(2)):
        with Locations((56.5, -88)):
            Rectangle(SKETCH_33_W, SKETCH_33_H)
    extrude(amount=EXTRUDE_10_DEPTH)

    # 凸台-拉伸11 outline → 凸台-拉伸11 (cut)
    with BuildSketch(Plane.XZ.offset(2)):
        with BuildLine():
            Line((71.5, -83), (69.5, -83))
            ThreePointArc((69.5, -83), (70.914213562, -83.585786438), (71.5, -85))
            Line((71.5, -85), (71.5, -83))
        make_face()
        with BuildLine():
            Line((43.5, -83), (41.5, -83))
            Line((41.5, -83), (41.5, -85))
            ThreePointArc((41.5, -85), (42.085786438, -83.585786438), (43.5, -83))
        make_face()
        with BuildLine():
            Line((71.5, -93), (71.5, -91))
            ThreePointArc((71.5, -91), (70.914213562, -92.414213562), (69.5, -93))
            Line((69.5, -93), (71.5, -93))
        make_face()
        with BuildLine():
            Line((41.5, -93), (43.5, -93))
            ThreePointArc((43.5, -93), (42.085786438, -92.414213562), (41.5, -91))
            Line((41.5, -91), (41.5, -93))
        make_face()
    extrude(amount=EXTRUDE_11_DEPTH, mode=Mode.SUBTRACT)

    # Extrude 11 2 outline → Extrude 11 2 (add)
    with BuildSketch(Plane.XZ.offset(2).offset(EXTRUDE_START)):
        with BuildLine():
            Line((71.3, -83), (68, -83))
            ThreePointArc((68, -83), (73, -88), (78, -83))
            Line((78, -83), (74.7, -83))
            ThreePointArc((74.7, -83), (73, -84.7), (71.3, -83))
        make_face()
        with BuildLine():
            ThreePointArc((89, -73), (86.071067812, -80.071067812), (79, -83))
            Line((79, -83), (89, -83))
            Line((89, -83), (89, -73))
        make_face()
        with BuildLine():
            Line((43, -83), (39.7, -83))
            ThreePointArc((39.7, -83), (38, -84.7), (36.3, -83))
            Line((36.3, -83), (34, -83))
            ThreePointArc((34, -83), (26.928932188, -80.071067812), (24, -73))
            Line((24, -73), (24, -83))
            Line((24, -83), (33, -83))
            ThreePointArc((33, -83), (38, -88), (43, -83))
        make_face()
        with BuildLine():
            ThreePointArc((79, -18), (86.071067812, -20.928932188), (89, -28))
            Line((89, -28), (89, -18))
            Line((89, -18), (79, -18))
        make_face()
        with Locations((73, -14.5)):
            Rectangle(EXTRUDE_11_2_OUTLINE_W, EXTRUDE_11_2_OUTLINE_H)
        with BuildLine():
            Line((24, -18), (24, -28))
            ThreePointArc((24, -28), (26.928932188, -20.928932188), (34, -18))
            Line((34, -18), (43, -18))
            Line((43, -18), (43, -11))
            Line((43, -11), (33, -11))
            Line((33, -11), (33, -18))
            Line((33, -18), (24, -18))
        make_face()
    extrude(amount=EXTRUDE_11_2_DEPTH)


solid = part.part
